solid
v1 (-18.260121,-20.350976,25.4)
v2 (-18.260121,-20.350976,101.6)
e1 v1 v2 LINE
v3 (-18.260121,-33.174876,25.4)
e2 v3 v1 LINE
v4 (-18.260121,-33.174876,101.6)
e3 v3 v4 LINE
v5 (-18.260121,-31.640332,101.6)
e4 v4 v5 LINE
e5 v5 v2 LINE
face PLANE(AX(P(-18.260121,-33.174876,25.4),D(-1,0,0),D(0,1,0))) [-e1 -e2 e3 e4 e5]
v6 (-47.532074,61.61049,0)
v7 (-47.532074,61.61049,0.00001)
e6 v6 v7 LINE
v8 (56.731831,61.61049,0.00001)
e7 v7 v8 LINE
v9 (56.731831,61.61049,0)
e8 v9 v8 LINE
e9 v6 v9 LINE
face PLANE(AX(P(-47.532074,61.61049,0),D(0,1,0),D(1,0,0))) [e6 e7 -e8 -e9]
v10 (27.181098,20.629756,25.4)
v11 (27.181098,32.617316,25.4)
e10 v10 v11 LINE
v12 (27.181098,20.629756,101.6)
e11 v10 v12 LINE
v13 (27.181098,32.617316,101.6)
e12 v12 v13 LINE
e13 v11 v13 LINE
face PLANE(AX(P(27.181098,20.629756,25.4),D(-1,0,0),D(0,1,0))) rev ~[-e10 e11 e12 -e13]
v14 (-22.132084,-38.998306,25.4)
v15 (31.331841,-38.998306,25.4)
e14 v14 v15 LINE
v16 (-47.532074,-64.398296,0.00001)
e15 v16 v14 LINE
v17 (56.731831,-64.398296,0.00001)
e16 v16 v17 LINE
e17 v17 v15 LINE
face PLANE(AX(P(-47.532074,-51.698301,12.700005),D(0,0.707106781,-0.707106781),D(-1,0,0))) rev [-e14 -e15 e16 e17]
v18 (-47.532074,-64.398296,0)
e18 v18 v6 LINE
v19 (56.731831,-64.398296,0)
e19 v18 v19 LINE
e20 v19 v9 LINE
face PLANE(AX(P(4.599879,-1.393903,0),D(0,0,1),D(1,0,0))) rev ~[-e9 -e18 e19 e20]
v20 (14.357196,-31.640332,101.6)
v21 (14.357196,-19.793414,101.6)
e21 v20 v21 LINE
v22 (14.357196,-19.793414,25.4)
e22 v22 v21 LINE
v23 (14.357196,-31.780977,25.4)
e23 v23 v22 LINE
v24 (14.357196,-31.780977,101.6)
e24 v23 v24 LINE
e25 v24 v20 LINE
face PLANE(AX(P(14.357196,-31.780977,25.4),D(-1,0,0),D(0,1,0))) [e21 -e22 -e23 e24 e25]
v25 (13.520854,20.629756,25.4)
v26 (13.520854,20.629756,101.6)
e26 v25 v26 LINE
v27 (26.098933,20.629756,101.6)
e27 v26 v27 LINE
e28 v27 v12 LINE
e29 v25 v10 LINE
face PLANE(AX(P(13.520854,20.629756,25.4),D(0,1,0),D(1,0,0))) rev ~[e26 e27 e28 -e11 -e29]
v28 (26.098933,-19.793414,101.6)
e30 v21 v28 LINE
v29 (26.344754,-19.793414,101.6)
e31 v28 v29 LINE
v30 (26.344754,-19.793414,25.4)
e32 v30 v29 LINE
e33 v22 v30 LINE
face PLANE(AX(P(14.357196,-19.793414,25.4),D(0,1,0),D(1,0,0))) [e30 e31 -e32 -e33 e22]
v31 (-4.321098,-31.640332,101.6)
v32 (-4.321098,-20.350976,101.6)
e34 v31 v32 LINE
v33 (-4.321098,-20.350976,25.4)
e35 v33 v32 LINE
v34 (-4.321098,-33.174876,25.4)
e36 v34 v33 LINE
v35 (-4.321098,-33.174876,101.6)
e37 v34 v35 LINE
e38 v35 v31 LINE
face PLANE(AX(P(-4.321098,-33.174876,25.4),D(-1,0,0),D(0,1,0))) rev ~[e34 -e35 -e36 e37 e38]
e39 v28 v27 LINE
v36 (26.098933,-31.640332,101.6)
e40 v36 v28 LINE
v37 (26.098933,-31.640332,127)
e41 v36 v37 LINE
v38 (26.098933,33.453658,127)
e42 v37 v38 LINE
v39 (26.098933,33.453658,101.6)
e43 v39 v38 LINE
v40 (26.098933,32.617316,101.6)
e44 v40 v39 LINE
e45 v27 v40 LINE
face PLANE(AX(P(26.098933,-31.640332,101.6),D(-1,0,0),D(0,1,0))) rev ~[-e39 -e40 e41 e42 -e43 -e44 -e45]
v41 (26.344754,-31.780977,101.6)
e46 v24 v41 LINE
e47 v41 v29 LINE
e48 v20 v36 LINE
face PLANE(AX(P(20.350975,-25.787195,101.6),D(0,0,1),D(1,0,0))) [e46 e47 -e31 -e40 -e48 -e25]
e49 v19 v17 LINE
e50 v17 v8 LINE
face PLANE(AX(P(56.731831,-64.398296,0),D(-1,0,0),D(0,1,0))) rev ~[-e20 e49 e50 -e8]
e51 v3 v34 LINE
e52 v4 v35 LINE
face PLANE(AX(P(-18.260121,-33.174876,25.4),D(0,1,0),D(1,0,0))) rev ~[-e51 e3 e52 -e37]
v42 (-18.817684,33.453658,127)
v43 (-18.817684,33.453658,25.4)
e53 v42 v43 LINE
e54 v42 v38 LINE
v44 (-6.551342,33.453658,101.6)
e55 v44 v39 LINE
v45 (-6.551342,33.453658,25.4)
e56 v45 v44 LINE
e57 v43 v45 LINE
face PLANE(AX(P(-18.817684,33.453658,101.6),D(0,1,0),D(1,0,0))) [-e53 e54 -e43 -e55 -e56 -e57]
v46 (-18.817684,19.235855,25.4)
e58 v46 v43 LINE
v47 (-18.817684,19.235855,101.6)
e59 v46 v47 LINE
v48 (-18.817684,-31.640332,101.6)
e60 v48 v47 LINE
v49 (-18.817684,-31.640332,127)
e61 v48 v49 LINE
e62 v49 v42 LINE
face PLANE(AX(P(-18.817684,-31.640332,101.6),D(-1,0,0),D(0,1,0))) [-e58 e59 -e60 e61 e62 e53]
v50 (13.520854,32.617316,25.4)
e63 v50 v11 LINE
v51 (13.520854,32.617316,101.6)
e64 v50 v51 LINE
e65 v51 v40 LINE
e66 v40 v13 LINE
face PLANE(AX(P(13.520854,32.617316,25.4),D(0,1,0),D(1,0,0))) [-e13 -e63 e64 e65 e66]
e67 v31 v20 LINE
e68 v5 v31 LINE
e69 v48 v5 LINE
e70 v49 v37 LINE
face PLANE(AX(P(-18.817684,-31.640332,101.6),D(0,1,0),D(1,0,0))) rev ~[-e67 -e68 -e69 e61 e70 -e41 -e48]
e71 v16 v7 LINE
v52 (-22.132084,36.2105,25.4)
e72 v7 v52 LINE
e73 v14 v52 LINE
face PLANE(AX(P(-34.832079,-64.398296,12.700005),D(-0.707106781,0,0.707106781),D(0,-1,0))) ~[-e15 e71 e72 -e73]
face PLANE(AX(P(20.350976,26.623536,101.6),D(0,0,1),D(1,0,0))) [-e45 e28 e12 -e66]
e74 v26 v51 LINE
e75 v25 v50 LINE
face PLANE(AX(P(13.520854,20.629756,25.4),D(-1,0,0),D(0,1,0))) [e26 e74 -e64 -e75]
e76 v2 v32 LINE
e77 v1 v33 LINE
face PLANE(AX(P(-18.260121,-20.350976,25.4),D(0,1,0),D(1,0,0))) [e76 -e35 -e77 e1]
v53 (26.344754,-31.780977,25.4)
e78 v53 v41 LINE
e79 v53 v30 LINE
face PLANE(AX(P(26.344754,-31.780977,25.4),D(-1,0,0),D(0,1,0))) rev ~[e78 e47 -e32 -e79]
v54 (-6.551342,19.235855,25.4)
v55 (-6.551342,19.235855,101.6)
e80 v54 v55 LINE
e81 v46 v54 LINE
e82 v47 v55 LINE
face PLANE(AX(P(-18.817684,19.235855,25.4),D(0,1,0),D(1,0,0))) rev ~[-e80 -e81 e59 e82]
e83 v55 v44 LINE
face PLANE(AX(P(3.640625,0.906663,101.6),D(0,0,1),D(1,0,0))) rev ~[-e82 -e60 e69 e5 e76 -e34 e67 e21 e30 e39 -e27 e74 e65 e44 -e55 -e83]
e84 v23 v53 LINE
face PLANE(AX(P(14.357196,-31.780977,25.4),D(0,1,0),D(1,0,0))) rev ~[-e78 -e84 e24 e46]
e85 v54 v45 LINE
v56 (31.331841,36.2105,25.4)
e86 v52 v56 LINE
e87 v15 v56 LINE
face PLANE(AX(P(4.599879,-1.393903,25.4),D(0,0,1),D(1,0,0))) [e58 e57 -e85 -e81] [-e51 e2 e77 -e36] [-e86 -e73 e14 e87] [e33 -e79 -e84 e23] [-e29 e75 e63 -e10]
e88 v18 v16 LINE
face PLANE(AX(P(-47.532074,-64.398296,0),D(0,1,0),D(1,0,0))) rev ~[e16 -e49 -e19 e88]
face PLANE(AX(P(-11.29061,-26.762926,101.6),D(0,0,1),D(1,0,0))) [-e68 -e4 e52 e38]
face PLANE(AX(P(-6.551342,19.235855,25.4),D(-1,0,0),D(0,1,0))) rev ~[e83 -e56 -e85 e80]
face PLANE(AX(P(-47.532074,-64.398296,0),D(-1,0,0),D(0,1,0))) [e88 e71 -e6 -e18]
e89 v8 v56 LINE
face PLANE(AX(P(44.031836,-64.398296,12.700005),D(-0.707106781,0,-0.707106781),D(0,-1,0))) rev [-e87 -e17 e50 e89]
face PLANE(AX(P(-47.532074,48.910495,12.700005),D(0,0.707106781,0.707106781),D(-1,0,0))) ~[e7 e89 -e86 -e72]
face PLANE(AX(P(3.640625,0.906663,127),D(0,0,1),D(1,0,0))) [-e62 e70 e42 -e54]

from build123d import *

# Parameters (mm, degrees)
F0_W     = 104.2639054358
F0_H     = 126.0087862611
F1_DEPTH = 25.4
F2_SIZE  = 25.39999
F3_W     = 12.2663415968
F3_H     = 14.2178032547
F3_W_2   = 13.6602446437
F3_H_2   = 11.9875594974
F3_W_3   = 13.9390230179
F3_H_3   = 12.8239002079
F3_W_4   = 11.9875576347
F3_H_4   = 11.9875632226
F4_DEPTH = 76.2
F5_W     = 44.9166167527
F5_H     = 65.0939904153
F6_DEPTH = 25.4


# Not quite as in the source:
# - a fillet or chamfer is up to 0.001 mm smaller than in the source, because OpenCascade refuses the exact size


with BuildPart() as f1:
    # F0 (on Top) → F1 (new body)
    with BuildSketch(Plane.XY):
        with Locations((4.5998785645, -1.3939030468)):
            Rectangle(F0_W, F0_H)
    extrude(amount=F1_DEPTH)

    # F2 (size 25.4 in the source; OpenCascade refuses exactly that, so slightly less here)
    f2_edges = [f1.edges().sort_by_distance(p)[0] for p in [
        (-47.532074, -1.393903, 25.4),
        (4.599879, -64.398296, 25.4),
        (56.731831, -1.393903, 25.4),
        (4.599879, 61.61049, 25.4),
    ]]
    chamfer(f2_edges, length=F2_SIZE)

    # F3 (on face) → F4 (join)
    with BuildSketch(Plane.XY.offset(25.4)):
        with Locations((-12.6845128834, 26.3447565958)):
            Rectangle(F3_W, F3_H)
        with Locations((20.3509759158, 26.6235359013)):
            Rectangle(F3_W_2, F3_H_2)
        with Locations((-11.2906098366, -26.7629260197)):
            Rectangle(F3_W_3, F3_H_3)
        with Locations((20.3509749845, -25.7871951908)):
            Rectangle(F3_W_4, F3_H_4)
    extrude(amount=F4_DEPTH)

    # F5 (on face) → F6 (join)
    with BuildSketch(Plane.XY.offset(101.6)):
        with Locations((3.6406246945, 0.9066630155)):
            Rectangle(F5_W, F5_H)
    extrude(amount=F6_DEPTH)


solid = f1.part
